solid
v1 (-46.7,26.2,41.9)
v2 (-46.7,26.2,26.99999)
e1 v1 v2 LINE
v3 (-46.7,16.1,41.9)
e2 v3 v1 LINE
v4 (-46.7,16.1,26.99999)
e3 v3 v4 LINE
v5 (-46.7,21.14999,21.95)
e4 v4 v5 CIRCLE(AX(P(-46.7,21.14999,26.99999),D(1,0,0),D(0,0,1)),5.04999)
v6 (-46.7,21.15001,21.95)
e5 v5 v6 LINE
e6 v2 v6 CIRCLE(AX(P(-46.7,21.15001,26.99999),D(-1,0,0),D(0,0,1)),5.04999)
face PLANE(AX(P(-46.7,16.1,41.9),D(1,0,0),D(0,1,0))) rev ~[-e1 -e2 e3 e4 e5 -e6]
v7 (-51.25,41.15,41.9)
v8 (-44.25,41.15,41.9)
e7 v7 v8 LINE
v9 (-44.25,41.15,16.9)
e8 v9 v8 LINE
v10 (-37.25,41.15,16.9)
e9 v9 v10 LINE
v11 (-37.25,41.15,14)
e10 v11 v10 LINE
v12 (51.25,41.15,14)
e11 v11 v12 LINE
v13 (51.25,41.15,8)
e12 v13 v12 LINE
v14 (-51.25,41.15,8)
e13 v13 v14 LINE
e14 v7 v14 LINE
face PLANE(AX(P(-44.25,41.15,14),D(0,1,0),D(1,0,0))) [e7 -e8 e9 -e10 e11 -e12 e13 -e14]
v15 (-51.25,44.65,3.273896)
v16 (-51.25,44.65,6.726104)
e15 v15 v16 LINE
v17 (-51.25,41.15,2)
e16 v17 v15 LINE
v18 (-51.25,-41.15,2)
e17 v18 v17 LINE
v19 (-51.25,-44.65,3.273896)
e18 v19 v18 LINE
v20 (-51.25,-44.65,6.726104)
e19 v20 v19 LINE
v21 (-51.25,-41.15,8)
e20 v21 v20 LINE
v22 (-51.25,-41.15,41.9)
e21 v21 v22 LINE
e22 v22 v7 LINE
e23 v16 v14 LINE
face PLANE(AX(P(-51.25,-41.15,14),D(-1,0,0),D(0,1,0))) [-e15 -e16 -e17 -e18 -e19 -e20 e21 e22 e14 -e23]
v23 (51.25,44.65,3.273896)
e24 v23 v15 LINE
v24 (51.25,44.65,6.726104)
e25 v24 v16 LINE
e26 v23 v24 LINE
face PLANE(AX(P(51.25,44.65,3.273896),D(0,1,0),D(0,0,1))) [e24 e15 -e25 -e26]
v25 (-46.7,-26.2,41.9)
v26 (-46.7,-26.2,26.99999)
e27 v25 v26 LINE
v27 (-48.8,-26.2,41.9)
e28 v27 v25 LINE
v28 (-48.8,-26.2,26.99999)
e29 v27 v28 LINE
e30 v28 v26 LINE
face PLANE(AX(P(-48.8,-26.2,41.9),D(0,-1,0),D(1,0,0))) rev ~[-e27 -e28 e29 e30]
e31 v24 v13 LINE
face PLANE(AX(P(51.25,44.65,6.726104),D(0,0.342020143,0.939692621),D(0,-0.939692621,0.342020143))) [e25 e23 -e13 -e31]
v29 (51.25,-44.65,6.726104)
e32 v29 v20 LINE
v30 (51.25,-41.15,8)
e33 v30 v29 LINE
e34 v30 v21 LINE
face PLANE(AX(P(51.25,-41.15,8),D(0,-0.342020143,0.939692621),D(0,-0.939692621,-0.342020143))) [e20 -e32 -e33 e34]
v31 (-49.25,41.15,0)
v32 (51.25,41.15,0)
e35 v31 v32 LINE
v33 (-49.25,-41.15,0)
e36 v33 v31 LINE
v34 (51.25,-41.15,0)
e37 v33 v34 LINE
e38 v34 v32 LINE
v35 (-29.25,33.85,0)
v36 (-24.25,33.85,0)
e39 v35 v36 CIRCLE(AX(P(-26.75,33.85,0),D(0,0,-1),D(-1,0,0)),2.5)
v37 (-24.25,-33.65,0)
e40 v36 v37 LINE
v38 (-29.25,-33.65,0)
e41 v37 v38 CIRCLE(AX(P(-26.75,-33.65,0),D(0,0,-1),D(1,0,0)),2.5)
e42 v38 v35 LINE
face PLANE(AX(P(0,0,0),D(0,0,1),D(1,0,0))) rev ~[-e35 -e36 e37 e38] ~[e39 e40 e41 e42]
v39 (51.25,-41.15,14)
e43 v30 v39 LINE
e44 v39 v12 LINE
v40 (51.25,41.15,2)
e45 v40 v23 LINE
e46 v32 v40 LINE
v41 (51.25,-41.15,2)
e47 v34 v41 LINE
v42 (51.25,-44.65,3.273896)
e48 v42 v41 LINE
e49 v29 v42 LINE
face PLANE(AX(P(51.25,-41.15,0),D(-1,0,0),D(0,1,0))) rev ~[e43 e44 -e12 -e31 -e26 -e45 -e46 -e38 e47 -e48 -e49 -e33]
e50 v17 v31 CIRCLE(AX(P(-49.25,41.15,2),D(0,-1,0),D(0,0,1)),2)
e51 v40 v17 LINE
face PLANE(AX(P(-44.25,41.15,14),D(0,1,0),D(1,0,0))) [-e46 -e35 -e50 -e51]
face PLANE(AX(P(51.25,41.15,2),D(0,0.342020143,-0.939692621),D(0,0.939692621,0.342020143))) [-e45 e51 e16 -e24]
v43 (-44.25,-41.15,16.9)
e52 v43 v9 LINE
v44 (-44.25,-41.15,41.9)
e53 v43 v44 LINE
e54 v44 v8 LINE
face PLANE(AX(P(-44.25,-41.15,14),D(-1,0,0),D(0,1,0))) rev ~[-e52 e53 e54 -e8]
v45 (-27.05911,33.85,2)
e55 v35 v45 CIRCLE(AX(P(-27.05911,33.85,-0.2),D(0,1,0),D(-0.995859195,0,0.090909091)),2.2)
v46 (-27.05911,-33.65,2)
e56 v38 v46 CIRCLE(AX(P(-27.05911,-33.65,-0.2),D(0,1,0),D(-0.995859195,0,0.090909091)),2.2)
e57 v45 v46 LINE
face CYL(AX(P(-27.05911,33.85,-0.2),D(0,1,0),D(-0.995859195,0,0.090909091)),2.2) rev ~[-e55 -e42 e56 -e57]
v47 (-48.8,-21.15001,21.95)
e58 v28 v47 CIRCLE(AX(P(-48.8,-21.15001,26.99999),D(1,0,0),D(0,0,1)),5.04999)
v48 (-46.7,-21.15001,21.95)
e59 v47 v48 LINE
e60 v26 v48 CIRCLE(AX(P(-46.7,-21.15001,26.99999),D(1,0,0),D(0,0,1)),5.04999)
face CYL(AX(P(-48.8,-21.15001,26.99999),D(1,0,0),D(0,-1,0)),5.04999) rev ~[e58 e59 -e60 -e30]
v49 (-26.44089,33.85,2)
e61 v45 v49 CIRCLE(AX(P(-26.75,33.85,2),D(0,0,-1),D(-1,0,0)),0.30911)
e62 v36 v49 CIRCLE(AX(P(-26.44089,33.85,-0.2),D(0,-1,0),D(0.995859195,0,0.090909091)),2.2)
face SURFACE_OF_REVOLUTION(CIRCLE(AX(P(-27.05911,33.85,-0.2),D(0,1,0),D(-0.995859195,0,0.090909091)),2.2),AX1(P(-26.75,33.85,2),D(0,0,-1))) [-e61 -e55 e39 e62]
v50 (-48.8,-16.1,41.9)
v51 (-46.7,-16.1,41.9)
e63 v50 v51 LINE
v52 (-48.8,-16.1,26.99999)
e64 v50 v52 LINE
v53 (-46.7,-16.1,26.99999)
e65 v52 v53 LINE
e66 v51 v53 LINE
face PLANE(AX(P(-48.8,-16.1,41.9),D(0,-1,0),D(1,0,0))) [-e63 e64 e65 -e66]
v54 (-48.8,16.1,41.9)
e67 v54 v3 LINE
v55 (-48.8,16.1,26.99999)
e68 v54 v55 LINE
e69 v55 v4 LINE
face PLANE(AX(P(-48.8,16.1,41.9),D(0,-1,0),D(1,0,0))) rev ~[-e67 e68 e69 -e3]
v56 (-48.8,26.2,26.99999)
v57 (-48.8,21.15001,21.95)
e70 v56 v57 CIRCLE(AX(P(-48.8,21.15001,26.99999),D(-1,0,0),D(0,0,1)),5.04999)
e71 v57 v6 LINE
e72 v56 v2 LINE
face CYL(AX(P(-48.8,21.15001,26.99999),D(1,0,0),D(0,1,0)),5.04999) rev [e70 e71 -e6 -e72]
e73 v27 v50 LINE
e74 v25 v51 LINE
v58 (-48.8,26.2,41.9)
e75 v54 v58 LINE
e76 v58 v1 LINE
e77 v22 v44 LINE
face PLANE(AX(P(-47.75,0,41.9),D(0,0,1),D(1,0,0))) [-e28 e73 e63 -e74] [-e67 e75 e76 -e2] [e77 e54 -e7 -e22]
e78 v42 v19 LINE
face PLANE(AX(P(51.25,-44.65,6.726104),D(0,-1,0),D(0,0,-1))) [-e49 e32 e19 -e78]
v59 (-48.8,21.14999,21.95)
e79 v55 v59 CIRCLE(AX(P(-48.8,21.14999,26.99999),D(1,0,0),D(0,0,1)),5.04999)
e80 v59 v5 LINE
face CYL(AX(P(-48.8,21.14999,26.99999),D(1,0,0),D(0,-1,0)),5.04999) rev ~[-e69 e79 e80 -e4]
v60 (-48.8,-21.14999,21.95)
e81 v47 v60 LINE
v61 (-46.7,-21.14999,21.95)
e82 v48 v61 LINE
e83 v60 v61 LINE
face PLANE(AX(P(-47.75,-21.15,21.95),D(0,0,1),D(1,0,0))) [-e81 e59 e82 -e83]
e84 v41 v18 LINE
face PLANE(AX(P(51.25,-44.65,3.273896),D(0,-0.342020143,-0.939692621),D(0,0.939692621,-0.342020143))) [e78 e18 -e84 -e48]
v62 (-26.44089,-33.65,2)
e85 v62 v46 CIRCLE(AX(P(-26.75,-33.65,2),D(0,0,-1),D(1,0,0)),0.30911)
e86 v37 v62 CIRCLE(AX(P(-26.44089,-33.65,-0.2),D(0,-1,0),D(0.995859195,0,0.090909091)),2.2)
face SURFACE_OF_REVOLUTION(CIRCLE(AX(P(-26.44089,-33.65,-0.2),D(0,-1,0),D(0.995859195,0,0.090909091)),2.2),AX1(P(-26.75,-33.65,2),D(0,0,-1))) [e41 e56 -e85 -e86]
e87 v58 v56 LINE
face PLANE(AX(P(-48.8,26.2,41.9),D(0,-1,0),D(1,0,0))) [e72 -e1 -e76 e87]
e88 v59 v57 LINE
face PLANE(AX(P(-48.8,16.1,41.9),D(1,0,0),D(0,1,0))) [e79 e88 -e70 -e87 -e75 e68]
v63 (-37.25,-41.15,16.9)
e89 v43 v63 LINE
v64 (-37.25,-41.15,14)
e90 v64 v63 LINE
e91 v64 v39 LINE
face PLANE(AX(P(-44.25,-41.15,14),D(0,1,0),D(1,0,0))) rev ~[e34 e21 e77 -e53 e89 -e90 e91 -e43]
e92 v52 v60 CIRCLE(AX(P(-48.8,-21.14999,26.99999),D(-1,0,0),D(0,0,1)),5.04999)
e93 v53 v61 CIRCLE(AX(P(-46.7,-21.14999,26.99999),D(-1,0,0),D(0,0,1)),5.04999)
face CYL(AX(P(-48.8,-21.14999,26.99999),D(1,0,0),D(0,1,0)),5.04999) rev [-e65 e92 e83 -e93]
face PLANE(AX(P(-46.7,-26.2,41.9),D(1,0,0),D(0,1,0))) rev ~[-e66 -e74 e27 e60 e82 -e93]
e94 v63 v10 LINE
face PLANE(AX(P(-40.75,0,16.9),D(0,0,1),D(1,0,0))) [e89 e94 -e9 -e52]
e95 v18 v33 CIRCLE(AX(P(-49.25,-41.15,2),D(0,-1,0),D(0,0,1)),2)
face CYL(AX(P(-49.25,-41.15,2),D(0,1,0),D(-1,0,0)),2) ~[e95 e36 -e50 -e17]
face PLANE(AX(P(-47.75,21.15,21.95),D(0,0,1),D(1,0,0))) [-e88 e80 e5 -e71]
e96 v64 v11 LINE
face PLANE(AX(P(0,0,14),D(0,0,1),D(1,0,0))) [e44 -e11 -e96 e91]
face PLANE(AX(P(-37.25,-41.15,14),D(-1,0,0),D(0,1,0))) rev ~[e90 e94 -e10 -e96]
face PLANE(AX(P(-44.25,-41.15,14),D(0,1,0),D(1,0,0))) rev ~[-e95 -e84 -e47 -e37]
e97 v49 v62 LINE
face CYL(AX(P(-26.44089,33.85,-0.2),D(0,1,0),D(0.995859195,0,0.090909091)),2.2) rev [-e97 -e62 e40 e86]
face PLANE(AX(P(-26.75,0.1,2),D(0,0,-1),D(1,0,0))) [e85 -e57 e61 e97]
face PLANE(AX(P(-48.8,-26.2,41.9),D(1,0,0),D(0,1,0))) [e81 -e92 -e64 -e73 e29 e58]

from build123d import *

# Parameters (mm, degrees)
F0_W         = 102.5
F0_H         = 82.3
F1_DEPTH     = 14
F2_W         = 7
F2_H         = 82.3
F3_DEPTH     = 27.9
F4_W         = 7
F4_H         = 82.3
F5_DEPTH     = 2.9
F7_DEPTH     = 102.5
F8_R         = 2
F11_DEPTH    = 2
F12_T1_DEPTH = 67.5
F12_T4_ANGLE = 180
F12_T6_ANGLE = 180
F13_W        = 2.1
F13_H        = 10.1
F14_DEPTH    = 19.95
F15_R        = 5.04999
F16_R        = 5.04999


# Not quite as in the source:
# - a fillet or chamfer that OpenCascade refuses, or shapes differently, is made with other operations: its cross-section is extruded or revolved along the edge and cut away or added
# - a fillet or chamfer is up to 0.001 mm smaller than in the source, because OpenCascade refuses the exact size


with BuildPart() as f1:
    # F0 (on Top) → F1 (new body)
    with BuildSketch(Plane.XY):
        Rectangle(F0_W, F0_H)
    extrude(amount=F1_DEPTH)

    # F2 (on face) → F3 (join)
    with BuildSketch(Plane.XY.offset(14)):
        with Locations((-47.75, 0)):
            Rectangle(F2_W, F2_H)
    extrude(amount=F3_DEPTH)

    # F4 (on face) → F5 (join)
    with BuildSketch(Plane.XY.offset(14)):
        with Locations((-40.75, 0)):
            Rectangle(F4_W, F4_H)
    extrude(amount=F5_DEPTH)

    # F6 (on face) → F7 (join)
    with BuildSketch(Plane.YZ.offset(51.25)):
        Polygon((41.15, 8), (41.15, 2), (44.65, 3.2738958199), (44.65, 6.7261041801), align=None)
        Polygon((-44.65, 3.2738958199), (-41.15, 2), (-41.15, 8), (-44.65, 6.7261041801), align=None)
    extrude(amount=-F7_DEPTH)

    # F8
    f8_edges = [f1.edges().sort_by_distance(p)[0] for p in [
        (-51.25, 0, 0),
    ]]
    fillet(f8_edges, radius=F8_R)

    # F10: union 

    # F9 (on face) → F11 (cut)
    with BuildSketch(Plane(origin=(0, 0, 0), x_dir=(1, 0, 0), z_dir=(0, 0, -1))):
        with BuildLine():
            ThreePointArc((-24.25, 33.65), (-26.75, 36.15), (-29.25, 33.65))
            Line((-29.25, 33.65), (-29.25, -33.85))
            ThreePointArc((-29.25, -33.85), (-26.75, -36.35), (-24.25, -33.85))
            Line((-24.25, -33.85), (-24.25, 33.65))
        make_face()
    extrude(amount=-F11_DEPTH, mode=Mode.SUBTRACT)

    # F12: fillet of radius 2.2 on 2 edges, made by hand

    # F12_s2 → F12_t1 (join)
    with BuildSketch(Plane.XZ.offset(-33.85)):
        with BuildLine():
            ThreePointArc((-29.25, 0), (-28.5423494674, 1.4248076809), (-27.05910977, 2))
            Line((-27.05910977, 2), (-29.25, 2))
            Line((-29.25, 2), (-29.25, 0))
        make_face()
        with BuildLine():
            ThreePointArc((-24.25, 0), (-24.9576505326, 1.4248076809), (-26.44089023, 2))
            Line((-26.44089023, 2), (-24.25, 2))
            Line((-24.25, 2), (-24.25, 0))
        make_face()
    extrude(amount=F12_T1_DEPTH)

    # F12_s3 → F12_t4 (revolve)
    with BuildSketch(Plane.XZ.offset(-33.85)):
        with BuildLine():
            ThreePointArc((-29.25, 0), (-28.5423494674, 1.4248076809), (-27.05910977, 2))
            Line((-27.05910977, 2), (-29.25, 2))
            Line((-29.25, 2), (-29.25, 0))
        make_face()
    revolve(axis=Axis((-26.75, 33.85, 2), (0, 0, -1)), revolution_arc=F12_T4_ANGLE)

    # F12_s5 → F12_t6 (revolve)
    with BuildSketch(Plane.XZ.offset(33.65)):
        with BuildLine():
            ThreePointArc((-24.25, 0), (-24.9576505326, 1.4248076809), (-26.44089023, 2))
            Line((-26.44089023, 2), (-24.25, 2))
            Line((-24.25, 2), (-24.25, 0))
        make_face()
    revolve(axis=Axis((-26.75, -33.65, 2), (0, 0, -1)), revolution_arc=F12_T6_ANGLE)

    # F13 (on face) → F14 (cut)
    with BuildSketch(Plane.XY.offset(41.9)):
        with Locations((-47.75, 21.15)):
            Rectangle(F13_W, F13_H)
        with Locations((-47.75, -21.15)):
            Rectangle(F13_W, F13_H)
    extrude(amount=-F14_DEPTH, mode=Mode.SUBTRACT)

    # F15 (radius 5.05 in the source; OpenCascade refuses exactly that, so slightly less here)
    f15_edges = [f1.edges().sort_by_distance(p)[0] for p in [
        (-47.75, 16.1, 21.95),
        (-47.75, 26.2, 21.95),
    ]]
    fillet(f15_edges, radius=F15_R)

    # F16 (radius 5.05 in the source; OpenCascade refuses exactly that, so slightly less here)
    f16_edges = [f1.edges().sort_by_distance(p)[0] for p in [
        (-47.75, -16.1, 21.95),
        (-47.75, -26.2, 21.95),
    ]]
    fillet(f16_edges, radius=F16_R)


solid = f1.part
